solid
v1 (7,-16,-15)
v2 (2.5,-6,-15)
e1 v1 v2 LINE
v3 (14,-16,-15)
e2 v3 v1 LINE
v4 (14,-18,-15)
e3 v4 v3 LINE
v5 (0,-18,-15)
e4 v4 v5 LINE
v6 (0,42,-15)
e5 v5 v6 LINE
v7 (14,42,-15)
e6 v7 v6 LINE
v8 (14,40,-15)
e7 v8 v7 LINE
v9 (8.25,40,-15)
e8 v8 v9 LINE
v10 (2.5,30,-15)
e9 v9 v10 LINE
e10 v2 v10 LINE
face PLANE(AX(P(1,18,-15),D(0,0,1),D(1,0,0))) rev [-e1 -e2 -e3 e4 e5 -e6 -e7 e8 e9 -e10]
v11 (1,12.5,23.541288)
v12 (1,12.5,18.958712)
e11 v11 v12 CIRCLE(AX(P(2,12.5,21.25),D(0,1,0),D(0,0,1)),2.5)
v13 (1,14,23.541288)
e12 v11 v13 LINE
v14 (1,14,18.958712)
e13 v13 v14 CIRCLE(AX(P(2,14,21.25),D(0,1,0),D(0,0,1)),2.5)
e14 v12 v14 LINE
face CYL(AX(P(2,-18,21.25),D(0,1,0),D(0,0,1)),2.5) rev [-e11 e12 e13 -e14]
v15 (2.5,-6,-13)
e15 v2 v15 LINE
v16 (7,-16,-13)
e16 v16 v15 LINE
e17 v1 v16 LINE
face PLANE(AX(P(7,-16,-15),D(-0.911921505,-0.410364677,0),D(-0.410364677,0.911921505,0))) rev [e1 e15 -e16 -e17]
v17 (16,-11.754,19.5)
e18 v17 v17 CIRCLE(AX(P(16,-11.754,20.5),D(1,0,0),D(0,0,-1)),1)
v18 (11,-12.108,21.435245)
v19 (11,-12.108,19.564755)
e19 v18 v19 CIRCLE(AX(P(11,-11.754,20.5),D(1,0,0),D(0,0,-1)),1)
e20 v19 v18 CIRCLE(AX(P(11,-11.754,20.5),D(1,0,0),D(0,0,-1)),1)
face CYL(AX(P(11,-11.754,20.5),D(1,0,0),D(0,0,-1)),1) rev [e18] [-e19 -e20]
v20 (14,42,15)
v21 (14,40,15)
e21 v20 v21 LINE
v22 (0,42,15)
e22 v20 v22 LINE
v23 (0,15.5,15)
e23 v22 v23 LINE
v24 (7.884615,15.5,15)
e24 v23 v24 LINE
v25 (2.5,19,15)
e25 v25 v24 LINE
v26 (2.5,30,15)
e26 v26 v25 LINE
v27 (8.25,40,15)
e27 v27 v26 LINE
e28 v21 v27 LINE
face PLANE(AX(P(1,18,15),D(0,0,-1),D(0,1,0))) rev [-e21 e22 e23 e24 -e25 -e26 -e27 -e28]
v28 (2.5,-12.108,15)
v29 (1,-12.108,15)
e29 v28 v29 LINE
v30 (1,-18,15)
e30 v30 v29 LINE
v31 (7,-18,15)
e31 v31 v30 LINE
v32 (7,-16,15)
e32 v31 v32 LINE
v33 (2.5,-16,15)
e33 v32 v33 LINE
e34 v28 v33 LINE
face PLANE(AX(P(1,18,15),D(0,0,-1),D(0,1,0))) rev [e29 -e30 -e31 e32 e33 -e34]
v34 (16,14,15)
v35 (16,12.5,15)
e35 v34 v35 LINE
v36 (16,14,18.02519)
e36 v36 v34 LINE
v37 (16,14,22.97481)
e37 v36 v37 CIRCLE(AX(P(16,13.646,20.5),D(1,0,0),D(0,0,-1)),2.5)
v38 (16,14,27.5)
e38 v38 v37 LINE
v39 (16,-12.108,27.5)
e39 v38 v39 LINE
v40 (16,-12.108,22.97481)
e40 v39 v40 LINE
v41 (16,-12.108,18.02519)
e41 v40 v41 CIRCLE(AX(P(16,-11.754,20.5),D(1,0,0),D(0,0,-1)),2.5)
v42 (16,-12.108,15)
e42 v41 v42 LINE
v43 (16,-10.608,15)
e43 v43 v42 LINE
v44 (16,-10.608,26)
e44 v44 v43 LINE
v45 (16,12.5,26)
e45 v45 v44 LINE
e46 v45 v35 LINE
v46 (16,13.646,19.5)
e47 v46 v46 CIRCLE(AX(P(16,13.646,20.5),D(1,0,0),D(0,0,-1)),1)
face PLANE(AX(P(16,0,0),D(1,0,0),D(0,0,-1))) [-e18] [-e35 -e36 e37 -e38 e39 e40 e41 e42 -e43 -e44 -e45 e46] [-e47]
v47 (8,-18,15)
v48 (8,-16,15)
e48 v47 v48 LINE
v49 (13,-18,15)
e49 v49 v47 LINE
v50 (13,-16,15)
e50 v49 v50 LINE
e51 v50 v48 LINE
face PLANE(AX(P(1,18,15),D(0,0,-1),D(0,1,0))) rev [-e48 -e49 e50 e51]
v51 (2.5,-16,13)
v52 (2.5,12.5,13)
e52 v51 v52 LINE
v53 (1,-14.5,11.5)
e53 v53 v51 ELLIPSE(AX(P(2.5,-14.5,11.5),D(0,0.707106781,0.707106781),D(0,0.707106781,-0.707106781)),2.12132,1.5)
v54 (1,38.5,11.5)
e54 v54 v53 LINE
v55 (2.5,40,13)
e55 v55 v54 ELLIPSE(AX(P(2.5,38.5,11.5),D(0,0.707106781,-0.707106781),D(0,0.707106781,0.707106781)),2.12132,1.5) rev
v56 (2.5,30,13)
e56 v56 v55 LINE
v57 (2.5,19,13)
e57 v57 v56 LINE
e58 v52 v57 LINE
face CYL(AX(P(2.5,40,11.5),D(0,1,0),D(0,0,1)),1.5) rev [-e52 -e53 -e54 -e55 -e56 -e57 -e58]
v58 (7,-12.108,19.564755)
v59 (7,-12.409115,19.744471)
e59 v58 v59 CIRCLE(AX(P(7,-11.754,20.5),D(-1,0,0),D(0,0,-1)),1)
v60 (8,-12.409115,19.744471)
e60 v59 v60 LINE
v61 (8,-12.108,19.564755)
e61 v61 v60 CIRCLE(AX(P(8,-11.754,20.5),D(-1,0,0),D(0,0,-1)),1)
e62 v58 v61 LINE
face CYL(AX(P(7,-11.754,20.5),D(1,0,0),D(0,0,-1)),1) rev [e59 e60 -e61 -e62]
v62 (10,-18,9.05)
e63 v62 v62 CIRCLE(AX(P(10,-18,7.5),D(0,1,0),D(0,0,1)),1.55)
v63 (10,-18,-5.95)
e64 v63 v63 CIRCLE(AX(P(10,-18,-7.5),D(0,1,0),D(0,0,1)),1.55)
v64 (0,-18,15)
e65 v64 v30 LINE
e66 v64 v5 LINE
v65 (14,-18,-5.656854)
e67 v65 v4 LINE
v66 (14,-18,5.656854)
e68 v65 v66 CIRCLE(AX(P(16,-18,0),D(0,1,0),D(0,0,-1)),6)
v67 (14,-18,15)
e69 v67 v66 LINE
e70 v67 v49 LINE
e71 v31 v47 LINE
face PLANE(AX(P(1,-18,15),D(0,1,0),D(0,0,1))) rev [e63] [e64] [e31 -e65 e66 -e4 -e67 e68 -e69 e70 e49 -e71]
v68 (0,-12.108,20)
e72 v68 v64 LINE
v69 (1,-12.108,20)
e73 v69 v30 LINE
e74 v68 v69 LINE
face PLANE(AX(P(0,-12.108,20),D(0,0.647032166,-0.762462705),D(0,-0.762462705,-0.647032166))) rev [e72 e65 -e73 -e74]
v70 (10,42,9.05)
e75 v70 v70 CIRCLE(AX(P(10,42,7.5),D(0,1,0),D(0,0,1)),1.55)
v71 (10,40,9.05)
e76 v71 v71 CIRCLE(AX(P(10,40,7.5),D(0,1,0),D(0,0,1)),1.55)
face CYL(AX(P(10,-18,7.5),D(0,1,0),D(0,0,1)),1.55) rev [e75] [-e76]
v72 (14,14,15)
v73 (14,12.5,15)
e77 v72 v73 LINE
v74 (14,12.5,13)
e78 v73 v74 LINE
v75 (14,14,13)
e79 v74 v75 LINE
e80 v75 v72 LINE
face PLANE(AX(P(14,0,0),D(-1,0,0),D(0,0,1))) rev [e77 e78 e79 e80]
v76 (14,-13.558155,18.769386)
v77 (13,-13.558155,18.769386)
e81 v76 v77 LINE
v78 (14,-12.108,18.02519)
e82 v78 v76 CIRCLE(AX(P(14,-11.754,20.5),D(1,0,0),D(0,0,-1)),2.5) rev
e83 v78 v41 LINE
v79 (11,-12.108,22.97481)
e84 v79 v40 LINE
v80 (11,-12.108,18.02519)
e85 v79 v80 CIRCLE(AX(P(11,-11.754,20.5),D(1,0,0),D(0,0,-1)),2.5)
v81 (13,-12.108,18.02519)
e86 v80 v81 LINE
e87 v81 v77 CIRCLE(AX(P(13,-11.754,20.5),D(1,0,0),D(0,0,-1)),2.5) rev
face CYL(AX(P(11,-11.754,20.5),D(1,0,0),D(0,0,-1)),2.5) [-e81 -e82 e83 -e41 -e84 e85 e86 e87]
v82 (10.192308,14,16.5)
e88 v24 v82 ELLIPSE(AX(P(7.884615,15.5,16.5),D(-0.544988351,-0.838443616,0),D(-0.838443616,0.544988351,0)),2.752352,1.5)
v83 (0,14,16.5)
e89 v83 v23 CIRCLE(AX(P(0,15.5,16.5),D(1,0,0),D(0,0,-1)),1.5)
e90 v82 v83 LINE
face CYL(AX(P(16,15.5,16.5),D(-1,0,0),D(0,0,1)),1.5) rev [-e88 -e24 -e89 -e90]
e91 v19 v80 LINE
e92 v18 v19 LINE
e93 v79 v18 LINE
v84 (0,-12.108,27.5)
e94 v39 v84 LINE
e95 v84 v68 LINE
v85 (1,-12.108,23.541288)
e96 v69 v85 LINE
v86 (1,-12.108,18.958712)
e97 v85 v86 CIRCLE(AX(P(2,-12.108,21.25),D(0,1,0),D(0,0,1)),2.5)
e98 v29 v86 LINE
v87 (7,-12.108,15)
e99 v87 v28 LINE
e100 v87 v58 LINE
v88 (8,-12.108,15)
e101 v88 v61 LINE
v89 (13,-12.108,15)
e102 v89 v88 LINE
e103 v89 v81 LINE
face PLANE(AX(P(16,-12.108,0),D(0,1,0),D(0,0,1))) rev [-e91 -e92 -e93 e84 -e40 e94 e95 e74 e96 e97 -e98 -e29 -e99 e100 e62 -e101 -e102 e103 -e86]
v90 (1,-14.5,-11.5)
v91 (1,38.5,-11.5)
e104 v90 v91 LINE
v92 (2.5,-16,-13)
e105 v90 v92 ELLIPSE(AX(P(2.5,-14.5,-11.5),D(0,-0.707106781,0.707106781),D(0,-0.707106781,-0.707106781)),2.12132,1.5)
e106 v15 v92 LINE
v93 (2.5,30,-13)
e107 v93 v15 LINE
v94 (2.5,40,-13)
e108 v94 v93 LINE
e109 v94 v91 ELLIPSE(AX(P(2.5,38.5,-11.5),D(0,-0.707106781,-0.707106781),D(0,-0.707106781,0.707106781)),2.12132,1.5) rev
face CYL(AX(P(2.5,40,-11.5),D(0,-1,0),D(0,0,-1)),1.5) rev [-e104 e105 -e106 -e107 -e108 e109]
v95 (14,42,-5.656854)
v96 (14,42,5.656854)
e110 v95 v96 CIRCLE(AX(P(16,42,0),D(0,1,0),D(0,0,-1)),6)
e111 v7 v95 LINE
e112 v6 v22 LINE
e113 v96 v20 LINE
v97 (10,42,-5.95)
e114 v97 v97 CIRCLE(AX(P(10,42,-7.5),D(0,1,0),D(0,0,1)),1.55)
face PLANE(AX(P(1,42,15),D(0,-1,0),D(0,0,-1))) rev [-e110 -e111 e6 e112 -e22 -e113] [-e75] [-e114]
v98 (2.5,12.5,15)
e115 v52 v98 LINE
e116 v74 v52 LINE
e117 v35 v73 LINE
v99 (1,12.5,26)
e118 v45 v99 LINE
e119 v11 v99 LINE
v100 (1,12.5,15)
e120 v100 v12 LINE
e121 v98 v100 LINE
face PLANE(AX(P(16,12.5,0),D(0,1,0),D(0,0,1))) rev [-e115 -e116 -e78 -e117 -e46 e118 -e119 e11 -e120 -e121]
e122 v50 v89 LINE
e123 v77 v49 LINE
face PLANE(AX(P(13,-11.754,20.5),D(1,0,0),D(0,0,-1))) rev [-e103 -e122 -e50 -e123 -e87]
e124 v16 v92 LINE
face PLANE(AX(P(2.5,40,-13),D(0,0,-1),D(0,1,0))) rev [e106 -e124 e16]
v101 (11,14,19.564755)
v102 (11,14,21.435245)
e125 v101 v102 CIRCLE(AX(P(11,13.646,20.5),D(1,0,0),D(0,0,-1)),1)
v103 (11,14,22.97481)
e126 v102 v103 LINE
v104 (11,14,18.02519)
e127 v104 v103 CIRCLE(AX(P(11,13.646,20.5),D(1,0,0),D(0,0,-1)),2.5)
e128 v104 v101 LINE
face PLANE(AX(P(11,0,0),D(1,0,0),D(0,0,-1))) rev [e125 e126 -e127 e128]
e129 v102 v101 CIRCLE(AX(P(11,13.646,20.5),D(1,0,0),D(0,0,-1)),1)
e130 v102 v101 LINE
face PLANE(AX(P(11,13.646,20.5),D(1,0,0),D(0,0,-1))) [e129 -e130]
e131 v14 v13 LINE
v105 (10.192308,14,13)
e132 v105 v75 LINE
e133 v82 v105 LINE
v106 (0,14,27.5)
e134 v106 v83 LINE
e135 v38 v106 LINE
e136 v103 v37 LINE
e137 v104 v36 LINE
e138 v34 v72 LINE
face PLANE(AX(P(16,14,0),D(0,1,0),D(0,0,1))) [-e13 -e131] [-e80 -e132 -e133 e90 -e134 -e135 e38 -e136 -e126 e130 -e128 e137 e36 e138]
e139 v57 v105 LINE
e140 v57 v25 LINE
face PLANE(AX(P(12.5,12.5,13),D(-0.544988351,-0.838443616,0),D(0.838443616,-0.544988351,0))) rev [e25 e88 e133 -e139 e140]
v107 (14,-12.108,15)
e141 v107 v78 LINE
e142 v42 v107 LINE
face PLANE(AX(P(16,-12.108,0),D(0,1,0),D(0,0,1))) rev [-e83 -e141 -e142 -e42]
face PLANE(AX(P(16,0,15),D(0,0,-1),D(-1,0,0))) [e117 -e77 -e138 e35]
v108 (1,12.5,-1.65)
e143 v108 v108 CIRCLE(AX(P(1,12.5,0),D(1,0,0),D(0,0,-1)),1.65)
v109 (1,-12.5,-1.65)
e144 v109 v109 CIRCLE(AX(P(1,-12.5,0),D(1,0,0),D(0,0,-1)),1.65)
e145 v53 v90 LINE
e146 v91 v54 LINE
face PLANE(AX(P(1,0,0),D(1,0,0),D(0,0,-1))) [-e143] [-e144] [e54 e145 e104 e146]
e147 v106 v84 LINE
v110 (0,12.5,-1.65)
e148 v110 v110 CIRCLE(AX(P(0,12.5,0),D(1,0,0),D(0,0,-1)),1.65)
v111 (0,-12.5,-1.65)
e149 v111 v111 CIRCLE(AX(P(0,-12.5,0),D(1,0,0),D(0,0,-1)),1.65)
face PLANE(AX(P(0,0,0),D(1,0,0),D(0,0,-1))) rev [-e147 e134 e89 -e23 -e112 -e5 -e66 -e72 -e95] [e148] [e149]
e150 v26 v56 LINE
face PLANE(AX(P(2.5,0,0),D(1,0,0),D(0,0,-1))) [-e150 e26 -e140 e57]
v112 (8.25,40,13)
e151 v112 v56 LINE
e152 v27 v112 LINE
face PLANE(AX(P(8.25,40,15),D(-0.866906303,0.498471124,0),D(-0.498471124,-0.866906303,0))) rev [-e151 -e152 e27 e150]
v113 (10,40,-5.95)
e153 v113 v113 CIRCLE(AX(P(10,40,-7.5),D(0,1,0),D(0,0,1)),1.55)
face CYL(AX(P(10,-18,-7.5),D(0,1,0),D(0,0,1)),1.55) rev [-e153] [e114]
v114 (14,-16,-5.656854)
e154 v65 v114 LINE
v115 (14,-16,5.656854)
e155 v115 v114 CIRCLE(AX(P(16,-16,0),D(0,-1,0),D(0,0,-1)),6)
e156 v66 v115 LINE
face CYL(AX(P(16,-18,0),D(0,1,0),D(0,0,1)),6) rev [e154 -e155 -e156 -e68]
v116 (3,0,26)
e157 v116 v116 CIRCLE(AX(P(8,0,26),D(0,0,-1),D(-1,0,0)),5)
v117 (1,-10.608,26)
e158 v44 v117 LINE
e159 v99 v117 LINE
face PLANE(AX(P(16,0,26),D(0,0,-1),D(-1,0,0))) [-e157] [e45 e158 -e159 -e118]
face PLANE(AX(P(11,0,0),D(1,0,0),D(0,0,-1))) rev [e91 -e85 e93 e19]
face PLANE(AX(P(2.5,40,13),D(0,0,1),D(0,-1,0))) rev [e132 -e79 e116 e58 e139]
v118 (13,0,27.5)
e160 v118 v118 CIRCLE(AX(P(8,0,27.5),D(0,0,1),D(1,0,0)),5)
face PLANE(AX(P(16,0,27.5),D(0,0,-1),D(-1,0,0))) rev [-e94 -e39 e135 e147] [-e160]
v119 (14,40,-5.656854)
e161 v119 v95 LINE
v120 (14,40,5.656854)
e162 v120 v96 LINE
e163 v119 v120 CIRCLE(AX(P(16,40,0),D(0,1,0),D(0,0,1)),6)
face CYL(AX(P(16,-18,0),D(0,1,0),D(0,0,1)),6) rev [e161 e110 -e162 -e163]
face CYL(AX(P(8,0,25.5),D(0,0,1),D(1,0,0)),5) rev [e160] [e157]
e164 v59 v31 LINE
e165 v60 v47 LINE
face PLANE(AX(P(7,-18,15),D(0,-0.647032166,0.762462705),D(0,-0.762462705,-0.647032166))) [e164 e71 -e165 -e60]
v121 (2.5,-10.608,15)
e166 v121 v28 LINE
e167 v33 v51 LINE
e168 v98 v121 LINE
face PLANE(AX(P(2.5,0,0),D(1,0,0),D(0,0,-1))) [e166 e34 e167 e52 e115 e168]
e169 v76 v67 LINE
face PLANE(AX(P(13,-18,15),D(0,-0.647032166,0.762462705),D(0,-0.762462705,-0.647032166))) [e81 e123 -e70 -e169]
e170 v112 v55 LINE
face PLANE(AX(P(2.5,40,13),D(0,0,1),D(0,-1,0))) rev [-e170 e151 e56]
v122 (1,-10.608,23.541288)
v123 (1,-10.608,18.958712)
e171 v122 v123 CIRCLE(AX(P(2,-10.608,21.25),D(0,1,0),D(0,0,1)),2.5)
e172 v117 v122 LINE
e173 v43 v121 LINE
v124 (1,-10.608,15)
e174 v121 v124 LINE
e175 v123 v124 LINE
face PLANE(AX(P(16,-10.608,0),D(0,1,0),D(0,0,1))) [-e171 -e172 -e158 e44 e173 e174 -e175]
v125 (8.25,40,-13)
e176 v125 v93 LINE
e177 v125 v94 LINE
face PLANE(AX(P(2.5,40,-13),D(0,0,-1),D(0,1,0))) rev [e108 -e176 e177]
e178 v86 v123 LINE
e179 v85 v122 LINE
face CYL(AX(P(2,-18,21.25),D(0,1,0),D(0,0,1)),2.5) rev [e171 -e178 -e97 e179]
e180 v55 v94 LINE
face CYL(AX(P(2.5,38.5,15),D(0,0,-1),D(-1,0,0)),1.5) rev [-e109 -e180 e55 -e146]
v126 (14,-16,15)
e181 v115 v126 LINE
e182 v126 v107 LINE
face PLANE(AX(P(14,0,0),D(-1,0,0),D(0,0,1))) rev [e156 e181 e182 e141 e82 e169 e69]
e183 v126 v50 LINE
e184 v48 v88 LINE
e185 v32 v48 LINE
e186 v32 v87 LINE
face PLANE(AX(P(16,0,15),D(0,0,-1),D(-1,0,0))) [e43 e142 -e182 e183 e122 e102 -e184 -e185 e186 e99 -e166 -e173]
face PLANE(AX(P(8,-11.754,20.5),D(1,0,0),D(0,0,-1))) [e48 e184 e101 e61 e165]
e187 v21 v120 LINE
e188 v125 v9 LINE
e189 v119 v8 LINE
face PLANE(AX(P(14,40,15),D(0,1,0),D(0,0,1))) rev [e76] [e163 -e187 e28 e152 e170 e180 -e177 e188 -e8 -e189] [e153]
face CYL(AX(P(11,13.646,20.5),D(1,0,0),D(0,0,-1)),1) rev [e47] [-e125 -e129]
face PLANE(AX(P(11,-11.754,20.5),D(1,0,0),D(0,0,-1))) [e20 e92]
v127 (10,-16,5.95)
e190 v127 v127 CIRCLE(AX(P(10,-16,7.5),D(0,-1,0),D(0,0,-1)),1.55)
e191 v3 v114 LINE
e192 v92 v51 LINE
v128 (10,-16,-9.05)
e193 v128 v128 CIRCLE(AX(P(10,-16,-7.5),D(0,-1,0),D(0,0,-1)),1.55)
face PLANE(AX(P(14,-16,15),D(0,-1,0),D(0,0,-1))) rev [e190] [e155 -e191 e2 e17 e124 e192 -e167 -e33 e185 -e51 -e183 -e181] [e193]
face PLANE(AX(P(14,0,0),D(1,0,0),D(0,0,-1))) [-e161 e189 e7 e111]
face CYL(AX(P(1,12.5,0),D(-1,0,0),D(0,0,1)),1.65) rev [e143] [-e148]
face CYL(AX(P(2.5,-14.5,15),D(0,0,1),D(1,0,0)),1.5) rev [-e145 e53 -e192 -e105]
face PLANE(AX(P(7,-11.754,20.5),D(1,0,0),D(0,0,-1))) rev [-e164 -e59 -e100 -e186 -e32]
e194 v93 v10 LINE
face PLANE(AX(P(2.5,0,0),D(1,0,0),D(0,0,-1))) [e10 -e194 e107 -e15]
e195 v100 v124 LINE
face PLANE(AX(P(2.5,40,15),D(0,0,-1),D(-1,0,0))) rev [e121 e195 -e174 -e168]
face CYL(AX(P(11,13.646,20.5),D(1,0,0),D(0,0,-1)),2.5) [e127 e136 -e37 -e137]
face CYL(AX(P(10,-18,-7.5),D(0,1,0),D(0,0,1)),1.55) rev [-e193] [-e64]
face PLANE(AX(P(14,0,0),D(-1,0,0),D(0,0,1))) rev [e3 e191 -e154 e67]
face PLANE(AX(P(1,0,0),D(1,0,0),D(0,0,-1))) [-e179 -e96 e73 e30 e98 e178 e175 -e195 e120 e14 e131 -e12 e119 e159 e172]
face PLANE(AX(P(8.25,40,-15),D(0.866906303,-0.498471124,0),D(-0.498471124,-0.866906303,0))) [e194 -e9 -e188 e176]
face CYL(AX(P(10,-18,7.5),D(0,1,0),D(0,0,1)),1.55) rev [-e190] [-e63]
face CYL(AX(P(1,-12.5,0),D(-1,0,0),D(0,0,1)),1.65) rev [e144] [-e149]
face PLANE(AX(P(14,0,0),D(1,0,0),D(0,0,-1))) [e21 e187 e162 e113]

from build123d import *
from build123d.topology import SkipClean

# Parameters (mm, degrees)
CROQUIS1_R               = 1.65
SALIENTE_EXTRUIR1_DEPTH  = 1
CROQUIS3_W               = 30
CROQUIS3_H               = 2
SALIENTE_EXTRUIR2_DEPTH  = 13
CROQUIS4_R               = 1.55
CORTAR_EXTRUIR1_DEPTH    = 64.41135545
CROQUIS8_W               = 11
CROQUIS8_H               = 23.108
SALIENTE_EXTRUIR4_DEPTH  = 1
SALIENTE_EXTRUIR5_DEPTH  = 16
CORTAR_EXTRUIR2_DEPTH    = 46.124826869
SALIENTE_EXTRUIR6_DEPTH  = 5
CROQUIS12_R              = 1
CORTAR_EXTRUIR3_DEPTH    = 5
CROQUIS13_W              = 2
CROQUIS13_H              = 56
SALIENTE_EXTRUIR7_DEPTH  = 1.5
SALIENTE_EXTRUIR8_DEPTH  = 2
CROQUIS15_W              = 2
CROQUIS15_H              = 1.5
SALIENTE_EXTRUIR9_DEPTH  = 5
NERVIO4_REACH            = 54.69
CROQUIS16_WALL_W         = 115.107854894
CROQUIS16_WALL_H         = 1
NERVIO5_REACH            = 56.037
CROQUIS17_WALL_W         = 121.609320684
CROQUIS17_WALL_H         = 2
SALIENTE_EXTRUIR10_DEPTH = 1
MATRIZL1_COUNT           = 2
MATRIZL1_PITCH           = 6
NERVIO9_REACH            = 63.857
CROQUIS19_WALL_W         = 137.248650414
CROQUIS19_WALL_H         = 2
NERVIO10_REACH           = 63.857
CROQUIS20_WALL_W         = 136.67923452
CROQUIS20_WALL_H         = 2
REDONDEO1_R              = 1.5
CROQUIS21_R              = 5
CORTAR_EXTRUIR4_DEPTH    = 2


with BuildPart() as part:
    # Croquis1 → Saliente-Extruir1 (new body)
    with BuildSketch(Plane(origin=(0, 0, 0), x_dir=(0, 0, -1), z_dir=(1, 0, 0))):
        Polygon((-15, 18), (-15, -18), (15, -18), (15, 18), (15, 42), (-15, 42), align=None)
        with Locations((0, 12.5)):
            Circle(CROQUIS1_R, mode=Mode.SUBTRACT)
        with Locations((0, -12.5)):
            Circle(CROQUIS1_R, mode=Mode.SUBTRACT)
    extrude(amount=SALIENTE_EXTRUIR1_DEPTH)

    # Croquis3 → Saliente-Extruir2 (add)
    with BuildSketch(Plane(origin=(1, 0, 0), x_dir=(0, 0, -1), z_dir=(1, 0, 0))):
        with Locations((0, 41)):
            Rectangle(CROQUIS3_W, CROQUIS3_H)
        with Locations((0, -17)):
            Rectangle(CROQUIS3_W, CROQUIS3_H)
    extrude(amount=SALIENTE_EXTRUIR2_DEPTH)

    # Croquis4 → Cortar-Extruir1 (cut, through all)
    with BuildSketch(Plane(origin=(0, 42, 0), x_dir=(1, 0, 0), z_dir=(0, 1, 0))):
        with Locations(Location((10, 7.5, 0), (0, 0, 270))):
            Circle(CROQUIS4_R)
        with Locations(Location((10, -7.5, 0), (0, 0, 270))):
            Circle(CROQUIS4_R)
        with BuildLine():
            Line((14, 5.656854249), (14, -5.656854249))
            ThreePointArc((14, -5.656854249), (10, 0), (14, 5.656854249))
        make_face()
    extrude(amount=-CORTAR_EXTRUIR1_DEPTH, mode=Mode.SUBTRACT)

    # Croquis8 → Saliente-Extruir4 (add)
    with BuildSketch(Plane(origin=(0, 0, 0), x_dir=(0, 0, -1), z_dir=(1, 0, 0))):
        with Locations((-20.5, 0.946)):
            Rectangle(CROQUIS8_W, CROQUIS8_H)
    extrude(amount=SALIENTE_EXTRUIR4_DEPTH)

    # Croquis9 → Saliente-Extruir5 (add)
    with BuildSketch(Plane(origin=(0, 0, 0), x_dir=(0, 0, -1), z_dir=(1, 0, 0))):
        Polygon((-26, -10.608), (-26, 12.5), (-15, 12.5), (-15, 14), (-27.5, 14), (-27.5, -12.108), (-15, -12.108), (-15, -10.608), align=None)
    extrude(amount=SALIENTE_EXTRUIR5_DEPTH)

    # Croquis10 → Cortar-Extruir2 (cut, through all)
    with BuildSketch(Plane(origin=(0, 14, 0), x_dir=(1, 0, 0), z_dir=(0, 1, 0))):
        with BuildLine():
            ThreePointArc((4.5, -21.25), (3.369306394, -19.158349934), (1, -18.958712153))
            Line((1, -18.958712153), (1, -23.541287847))
            ThreePointArc((1, -23.541287847), (3.369306394, -23.341650066), (4.5, -21.25))
        make_face()
    extrude(amount=-CORTAR_EXTRUIR2_DEPTH, mode=Mode.SUBTRACT)

    # Croquis11 → Saliente-Extruir6 (add)
    with BuildSketch(Plane(origin=(16, 0, 0), x_dir=(0, 0, -1), z_dir=(1, 0, 0))):
        with BuildLine():
            Line((-21.435245422, -12.108), (-22.974809892, -12.108))
            ThreePointArc((-22.974809892, -12.108), (-20.5, -14.254), (-18.025190108, -12.108))
            Line((-18.025190108, -12.108), (-19.564754578, -12.108))
            ThreePointArc((-19.564754578, -12.108), (-20.5, -12.754), (-21.435245422, -12.108))
        make_face()
        with BuildLine():
            ThreePointArc((-18.025190108, 14), (-20.5, 16.146), (-22.974809892, 14))
            Line((-22.974809892, 14), (-21.435245422, 14))
            ThreePointArc((-21.435245422, 14), (-20.5, 14.646), (-19.564754578, 14))
            Line((-19.564754578, 14), (-18.025190108, 14))
        make_face()
    extrude(amount=-SALIENTE_EXTRUIR6_DEPTH)

    # Croquis12 → Cortar-Extruir3 (cut)
    with BuildSketch(Plane(origin=(16, 0, 0), x_dir=(0, 0, -1), z_dir=(1, 0, 0))):
        with Locations((-20.5, -11.754)):
            Circle(CROQUIS12_R)
        with Locations((-20.5, 13.646)):
            Circle(CROQUIS12_R)
    extrude(amount=-CORTAR_EXTRUIR3_DEPTH, mode=Mode.SUBTRACT)

    # Croquis13 → Saliente-Extruir7 (add)
    with BuildSketch(Plane(origin=(1, 0, 0), x_dir=(0, 0, -1), z_dir=(1, 0, 0))):
        with Locations((-14, 12)):
            Rectangle(CROQUIS13_W, CROQUIS13_H)
        with Locations((14, 12)):
            Rectangle(CROQUIS13_W, CROQUIS13_H)
    extrude(amount=SALIENTE_EXTRUIR7_DEPTH)

    # Croquis14 → Saliente-Extruir8 (add)
    with BuildSketch(Plane(origin=(0, 0, 15), x_dir=(-1, 0, 0), z_dir=(0, 0, -1))):
        Polygon((-12.5, 12.5), (-2.5, 19), (-2.5, 12.5), align=None)
    extrude(amount=SALIENTE_EXTRUIR8_DEPTH)

    # Croquis15 → Saliente-Extruir9 (add)
    with BuildSketch(Plane(origin=(14, 0, 0), x_dir=(0, 0, -1), z_dir=(1, 0, 0))):
        with Locations((-14, 13.25)):
            Rectangle(CROQUIS15_W, CROQUIS15_H)
    extrude(amount=-SALIENTE_EXTRUIR9_DEPTH)

    # Croquis16 wall → Nervio4 (add, up to next)
    with BuildSketch(Plane(origin=(0, -15.054, 17.5), x_dir=(0, -0.76246270462, -0.647032166174), z_dir=(0, -0.647032166174, 0.76246270462)), mode=Mode.PRIVATE) as nervio4_sk1:
        with Locations((0, 0.5)):
            Rectangle(CROQUIS16_WALL_W, CROQUIS16_WALL_H)
    nervio4_tool1 = extrude(nervio4_sk1.sketch, amount=-NERVIO4_REACH, mode=Mode.PRIVATE) - part.part
    add(nervio4_tool1.solids().sort_by_distance((0, -15.054, 17.5))[0])

    # Croquis17 wall → Nervio5 (add, up to next)
    with BuildSketch(Plane(origin=(5.375, 35, 15), x_dir=(-0.498471124258, -0.866906303058, 0), z_dir=(0.866906303058, -0.498471124258, 0)), mode=Mode.PRIVATE) as nervio5_sk1:
        with Locations((0, 1)):
            Rectangle(CROQUIS17_WALL_W, CROQUIS17_WALL_H)
    nervio5_tool1 = extrude(nervio5_sk1.sketch, amount=-NERVIO5_REACH, mode=Mode.PRIVATE) - part.part
    add(nervio5_tool1.solids().sort_by_distance((5.375, 35, 15))[0])

    # Croquis18 → Saliente-Extruir10 (add)
    with SkipClean():  # the faces are left unmerged after this step: merging them gives an invalid solid
        with BuildSketch(Plane(origin=(14, 0, 0), x_dir=(0, 0, -1), z_dir=(1, 0, 0))):
            with BuildLine():
                Line((-15, -18), (-19.744471073, -12.409115288))
                ThreePointArc((-19.744471073, -12.409115288), (-19.641310837, -12.266496752), (-19.564754578, -12.108))
                Line((-19.564754578, -12.108), (-15, -12.108))
                Line((-15, -12.108), (-15, -18))
            make_face()
        saliente_extruir10 = extrude(amount=-SALIENTE_EXTRUIR10_DEPTH)

    # MatrizL1: Saliente-Extruir10 ×2
    with SkipClean():  # the faces are left unmerged after this step: merging them gives an invalid solid
        with Locations(*[(-i * MATRIZL1_PITCH, 0, 0) for i in range(1, MATRIZL1_COUNT)]):
            add(saliente_extruir10)

    # Croquis19 wall → Nervio9 (add, up to next)
    with BuildSketch(Plane(origin=(5.375, 35, -15), x_dir=(-0.498471124258, -0.866906303058, 0), z_dir=(-0.866906303058, 0.498471124258, 0)), mode=Mode.PRIVATE) as nervio9_sk1:
        with Locations((0, 1)):
            Rectangle(CROQUIS19_WALL_W, CROQUIS19_WALL_H)
    nervio9_tool1 = extrude(nervio9_sk1.sketch, amount=NERVIO9_REACH, mode=Mode.PRIVATE) - part.part
    add(nervio9_tool1.solids().sort_by_distance((5.375, 35, -15))[0])

    # Croquis20 wall → Nervio10 (add, up to next)
    with BuildSketch(Plane(origin=(4.75, -11, -15), x_dir=(-0.410364677329, 0.911921505175, 0), z_dir=(0.911921505175, 0.410364677329, 0)), mode=Mode.PRIVATE) as nervio10_sk1:
        with Locations((0, 1)):
            Rectangle(CROQUIS20_WALL_W, CROQUIS20_WALL_H)
    nervio10_tool1 = extrude(nervio10_sk1.sketch, amount=-NERVIO10_REACH, mode=Mode.PRIVATE) - part.part
    add(nervio10_tool1.solids().sort_by_distance((4.75, -11, -15))[0])

    # Redondeo1
    redondeo1_edges = [part.edges().sort_by_distance(p)[0] for p in [
        (5.096153846, 14, 15),
        (1, 40, 0),
        (1, 12, 13),
        (1, -16, 0),
        (1, 12, -13),
    ]]
    fillet(redondeo1_edges, radius=REDONDEO1_R - 0.0001)  # a hair under: the kernel refuses the full size

    # Croquis21 → Cortar-Extruir4 (cut)
    with BuildSketch(Plane.XY.offset(27.5)):
        with Locations((8, 0)):
            Circle(CROQUIS21_R)
    extrude(amount=-CORTAR_EXTRUIR4_DEPTH, mode=Mode.SUBTRACT)


solid = part.part
